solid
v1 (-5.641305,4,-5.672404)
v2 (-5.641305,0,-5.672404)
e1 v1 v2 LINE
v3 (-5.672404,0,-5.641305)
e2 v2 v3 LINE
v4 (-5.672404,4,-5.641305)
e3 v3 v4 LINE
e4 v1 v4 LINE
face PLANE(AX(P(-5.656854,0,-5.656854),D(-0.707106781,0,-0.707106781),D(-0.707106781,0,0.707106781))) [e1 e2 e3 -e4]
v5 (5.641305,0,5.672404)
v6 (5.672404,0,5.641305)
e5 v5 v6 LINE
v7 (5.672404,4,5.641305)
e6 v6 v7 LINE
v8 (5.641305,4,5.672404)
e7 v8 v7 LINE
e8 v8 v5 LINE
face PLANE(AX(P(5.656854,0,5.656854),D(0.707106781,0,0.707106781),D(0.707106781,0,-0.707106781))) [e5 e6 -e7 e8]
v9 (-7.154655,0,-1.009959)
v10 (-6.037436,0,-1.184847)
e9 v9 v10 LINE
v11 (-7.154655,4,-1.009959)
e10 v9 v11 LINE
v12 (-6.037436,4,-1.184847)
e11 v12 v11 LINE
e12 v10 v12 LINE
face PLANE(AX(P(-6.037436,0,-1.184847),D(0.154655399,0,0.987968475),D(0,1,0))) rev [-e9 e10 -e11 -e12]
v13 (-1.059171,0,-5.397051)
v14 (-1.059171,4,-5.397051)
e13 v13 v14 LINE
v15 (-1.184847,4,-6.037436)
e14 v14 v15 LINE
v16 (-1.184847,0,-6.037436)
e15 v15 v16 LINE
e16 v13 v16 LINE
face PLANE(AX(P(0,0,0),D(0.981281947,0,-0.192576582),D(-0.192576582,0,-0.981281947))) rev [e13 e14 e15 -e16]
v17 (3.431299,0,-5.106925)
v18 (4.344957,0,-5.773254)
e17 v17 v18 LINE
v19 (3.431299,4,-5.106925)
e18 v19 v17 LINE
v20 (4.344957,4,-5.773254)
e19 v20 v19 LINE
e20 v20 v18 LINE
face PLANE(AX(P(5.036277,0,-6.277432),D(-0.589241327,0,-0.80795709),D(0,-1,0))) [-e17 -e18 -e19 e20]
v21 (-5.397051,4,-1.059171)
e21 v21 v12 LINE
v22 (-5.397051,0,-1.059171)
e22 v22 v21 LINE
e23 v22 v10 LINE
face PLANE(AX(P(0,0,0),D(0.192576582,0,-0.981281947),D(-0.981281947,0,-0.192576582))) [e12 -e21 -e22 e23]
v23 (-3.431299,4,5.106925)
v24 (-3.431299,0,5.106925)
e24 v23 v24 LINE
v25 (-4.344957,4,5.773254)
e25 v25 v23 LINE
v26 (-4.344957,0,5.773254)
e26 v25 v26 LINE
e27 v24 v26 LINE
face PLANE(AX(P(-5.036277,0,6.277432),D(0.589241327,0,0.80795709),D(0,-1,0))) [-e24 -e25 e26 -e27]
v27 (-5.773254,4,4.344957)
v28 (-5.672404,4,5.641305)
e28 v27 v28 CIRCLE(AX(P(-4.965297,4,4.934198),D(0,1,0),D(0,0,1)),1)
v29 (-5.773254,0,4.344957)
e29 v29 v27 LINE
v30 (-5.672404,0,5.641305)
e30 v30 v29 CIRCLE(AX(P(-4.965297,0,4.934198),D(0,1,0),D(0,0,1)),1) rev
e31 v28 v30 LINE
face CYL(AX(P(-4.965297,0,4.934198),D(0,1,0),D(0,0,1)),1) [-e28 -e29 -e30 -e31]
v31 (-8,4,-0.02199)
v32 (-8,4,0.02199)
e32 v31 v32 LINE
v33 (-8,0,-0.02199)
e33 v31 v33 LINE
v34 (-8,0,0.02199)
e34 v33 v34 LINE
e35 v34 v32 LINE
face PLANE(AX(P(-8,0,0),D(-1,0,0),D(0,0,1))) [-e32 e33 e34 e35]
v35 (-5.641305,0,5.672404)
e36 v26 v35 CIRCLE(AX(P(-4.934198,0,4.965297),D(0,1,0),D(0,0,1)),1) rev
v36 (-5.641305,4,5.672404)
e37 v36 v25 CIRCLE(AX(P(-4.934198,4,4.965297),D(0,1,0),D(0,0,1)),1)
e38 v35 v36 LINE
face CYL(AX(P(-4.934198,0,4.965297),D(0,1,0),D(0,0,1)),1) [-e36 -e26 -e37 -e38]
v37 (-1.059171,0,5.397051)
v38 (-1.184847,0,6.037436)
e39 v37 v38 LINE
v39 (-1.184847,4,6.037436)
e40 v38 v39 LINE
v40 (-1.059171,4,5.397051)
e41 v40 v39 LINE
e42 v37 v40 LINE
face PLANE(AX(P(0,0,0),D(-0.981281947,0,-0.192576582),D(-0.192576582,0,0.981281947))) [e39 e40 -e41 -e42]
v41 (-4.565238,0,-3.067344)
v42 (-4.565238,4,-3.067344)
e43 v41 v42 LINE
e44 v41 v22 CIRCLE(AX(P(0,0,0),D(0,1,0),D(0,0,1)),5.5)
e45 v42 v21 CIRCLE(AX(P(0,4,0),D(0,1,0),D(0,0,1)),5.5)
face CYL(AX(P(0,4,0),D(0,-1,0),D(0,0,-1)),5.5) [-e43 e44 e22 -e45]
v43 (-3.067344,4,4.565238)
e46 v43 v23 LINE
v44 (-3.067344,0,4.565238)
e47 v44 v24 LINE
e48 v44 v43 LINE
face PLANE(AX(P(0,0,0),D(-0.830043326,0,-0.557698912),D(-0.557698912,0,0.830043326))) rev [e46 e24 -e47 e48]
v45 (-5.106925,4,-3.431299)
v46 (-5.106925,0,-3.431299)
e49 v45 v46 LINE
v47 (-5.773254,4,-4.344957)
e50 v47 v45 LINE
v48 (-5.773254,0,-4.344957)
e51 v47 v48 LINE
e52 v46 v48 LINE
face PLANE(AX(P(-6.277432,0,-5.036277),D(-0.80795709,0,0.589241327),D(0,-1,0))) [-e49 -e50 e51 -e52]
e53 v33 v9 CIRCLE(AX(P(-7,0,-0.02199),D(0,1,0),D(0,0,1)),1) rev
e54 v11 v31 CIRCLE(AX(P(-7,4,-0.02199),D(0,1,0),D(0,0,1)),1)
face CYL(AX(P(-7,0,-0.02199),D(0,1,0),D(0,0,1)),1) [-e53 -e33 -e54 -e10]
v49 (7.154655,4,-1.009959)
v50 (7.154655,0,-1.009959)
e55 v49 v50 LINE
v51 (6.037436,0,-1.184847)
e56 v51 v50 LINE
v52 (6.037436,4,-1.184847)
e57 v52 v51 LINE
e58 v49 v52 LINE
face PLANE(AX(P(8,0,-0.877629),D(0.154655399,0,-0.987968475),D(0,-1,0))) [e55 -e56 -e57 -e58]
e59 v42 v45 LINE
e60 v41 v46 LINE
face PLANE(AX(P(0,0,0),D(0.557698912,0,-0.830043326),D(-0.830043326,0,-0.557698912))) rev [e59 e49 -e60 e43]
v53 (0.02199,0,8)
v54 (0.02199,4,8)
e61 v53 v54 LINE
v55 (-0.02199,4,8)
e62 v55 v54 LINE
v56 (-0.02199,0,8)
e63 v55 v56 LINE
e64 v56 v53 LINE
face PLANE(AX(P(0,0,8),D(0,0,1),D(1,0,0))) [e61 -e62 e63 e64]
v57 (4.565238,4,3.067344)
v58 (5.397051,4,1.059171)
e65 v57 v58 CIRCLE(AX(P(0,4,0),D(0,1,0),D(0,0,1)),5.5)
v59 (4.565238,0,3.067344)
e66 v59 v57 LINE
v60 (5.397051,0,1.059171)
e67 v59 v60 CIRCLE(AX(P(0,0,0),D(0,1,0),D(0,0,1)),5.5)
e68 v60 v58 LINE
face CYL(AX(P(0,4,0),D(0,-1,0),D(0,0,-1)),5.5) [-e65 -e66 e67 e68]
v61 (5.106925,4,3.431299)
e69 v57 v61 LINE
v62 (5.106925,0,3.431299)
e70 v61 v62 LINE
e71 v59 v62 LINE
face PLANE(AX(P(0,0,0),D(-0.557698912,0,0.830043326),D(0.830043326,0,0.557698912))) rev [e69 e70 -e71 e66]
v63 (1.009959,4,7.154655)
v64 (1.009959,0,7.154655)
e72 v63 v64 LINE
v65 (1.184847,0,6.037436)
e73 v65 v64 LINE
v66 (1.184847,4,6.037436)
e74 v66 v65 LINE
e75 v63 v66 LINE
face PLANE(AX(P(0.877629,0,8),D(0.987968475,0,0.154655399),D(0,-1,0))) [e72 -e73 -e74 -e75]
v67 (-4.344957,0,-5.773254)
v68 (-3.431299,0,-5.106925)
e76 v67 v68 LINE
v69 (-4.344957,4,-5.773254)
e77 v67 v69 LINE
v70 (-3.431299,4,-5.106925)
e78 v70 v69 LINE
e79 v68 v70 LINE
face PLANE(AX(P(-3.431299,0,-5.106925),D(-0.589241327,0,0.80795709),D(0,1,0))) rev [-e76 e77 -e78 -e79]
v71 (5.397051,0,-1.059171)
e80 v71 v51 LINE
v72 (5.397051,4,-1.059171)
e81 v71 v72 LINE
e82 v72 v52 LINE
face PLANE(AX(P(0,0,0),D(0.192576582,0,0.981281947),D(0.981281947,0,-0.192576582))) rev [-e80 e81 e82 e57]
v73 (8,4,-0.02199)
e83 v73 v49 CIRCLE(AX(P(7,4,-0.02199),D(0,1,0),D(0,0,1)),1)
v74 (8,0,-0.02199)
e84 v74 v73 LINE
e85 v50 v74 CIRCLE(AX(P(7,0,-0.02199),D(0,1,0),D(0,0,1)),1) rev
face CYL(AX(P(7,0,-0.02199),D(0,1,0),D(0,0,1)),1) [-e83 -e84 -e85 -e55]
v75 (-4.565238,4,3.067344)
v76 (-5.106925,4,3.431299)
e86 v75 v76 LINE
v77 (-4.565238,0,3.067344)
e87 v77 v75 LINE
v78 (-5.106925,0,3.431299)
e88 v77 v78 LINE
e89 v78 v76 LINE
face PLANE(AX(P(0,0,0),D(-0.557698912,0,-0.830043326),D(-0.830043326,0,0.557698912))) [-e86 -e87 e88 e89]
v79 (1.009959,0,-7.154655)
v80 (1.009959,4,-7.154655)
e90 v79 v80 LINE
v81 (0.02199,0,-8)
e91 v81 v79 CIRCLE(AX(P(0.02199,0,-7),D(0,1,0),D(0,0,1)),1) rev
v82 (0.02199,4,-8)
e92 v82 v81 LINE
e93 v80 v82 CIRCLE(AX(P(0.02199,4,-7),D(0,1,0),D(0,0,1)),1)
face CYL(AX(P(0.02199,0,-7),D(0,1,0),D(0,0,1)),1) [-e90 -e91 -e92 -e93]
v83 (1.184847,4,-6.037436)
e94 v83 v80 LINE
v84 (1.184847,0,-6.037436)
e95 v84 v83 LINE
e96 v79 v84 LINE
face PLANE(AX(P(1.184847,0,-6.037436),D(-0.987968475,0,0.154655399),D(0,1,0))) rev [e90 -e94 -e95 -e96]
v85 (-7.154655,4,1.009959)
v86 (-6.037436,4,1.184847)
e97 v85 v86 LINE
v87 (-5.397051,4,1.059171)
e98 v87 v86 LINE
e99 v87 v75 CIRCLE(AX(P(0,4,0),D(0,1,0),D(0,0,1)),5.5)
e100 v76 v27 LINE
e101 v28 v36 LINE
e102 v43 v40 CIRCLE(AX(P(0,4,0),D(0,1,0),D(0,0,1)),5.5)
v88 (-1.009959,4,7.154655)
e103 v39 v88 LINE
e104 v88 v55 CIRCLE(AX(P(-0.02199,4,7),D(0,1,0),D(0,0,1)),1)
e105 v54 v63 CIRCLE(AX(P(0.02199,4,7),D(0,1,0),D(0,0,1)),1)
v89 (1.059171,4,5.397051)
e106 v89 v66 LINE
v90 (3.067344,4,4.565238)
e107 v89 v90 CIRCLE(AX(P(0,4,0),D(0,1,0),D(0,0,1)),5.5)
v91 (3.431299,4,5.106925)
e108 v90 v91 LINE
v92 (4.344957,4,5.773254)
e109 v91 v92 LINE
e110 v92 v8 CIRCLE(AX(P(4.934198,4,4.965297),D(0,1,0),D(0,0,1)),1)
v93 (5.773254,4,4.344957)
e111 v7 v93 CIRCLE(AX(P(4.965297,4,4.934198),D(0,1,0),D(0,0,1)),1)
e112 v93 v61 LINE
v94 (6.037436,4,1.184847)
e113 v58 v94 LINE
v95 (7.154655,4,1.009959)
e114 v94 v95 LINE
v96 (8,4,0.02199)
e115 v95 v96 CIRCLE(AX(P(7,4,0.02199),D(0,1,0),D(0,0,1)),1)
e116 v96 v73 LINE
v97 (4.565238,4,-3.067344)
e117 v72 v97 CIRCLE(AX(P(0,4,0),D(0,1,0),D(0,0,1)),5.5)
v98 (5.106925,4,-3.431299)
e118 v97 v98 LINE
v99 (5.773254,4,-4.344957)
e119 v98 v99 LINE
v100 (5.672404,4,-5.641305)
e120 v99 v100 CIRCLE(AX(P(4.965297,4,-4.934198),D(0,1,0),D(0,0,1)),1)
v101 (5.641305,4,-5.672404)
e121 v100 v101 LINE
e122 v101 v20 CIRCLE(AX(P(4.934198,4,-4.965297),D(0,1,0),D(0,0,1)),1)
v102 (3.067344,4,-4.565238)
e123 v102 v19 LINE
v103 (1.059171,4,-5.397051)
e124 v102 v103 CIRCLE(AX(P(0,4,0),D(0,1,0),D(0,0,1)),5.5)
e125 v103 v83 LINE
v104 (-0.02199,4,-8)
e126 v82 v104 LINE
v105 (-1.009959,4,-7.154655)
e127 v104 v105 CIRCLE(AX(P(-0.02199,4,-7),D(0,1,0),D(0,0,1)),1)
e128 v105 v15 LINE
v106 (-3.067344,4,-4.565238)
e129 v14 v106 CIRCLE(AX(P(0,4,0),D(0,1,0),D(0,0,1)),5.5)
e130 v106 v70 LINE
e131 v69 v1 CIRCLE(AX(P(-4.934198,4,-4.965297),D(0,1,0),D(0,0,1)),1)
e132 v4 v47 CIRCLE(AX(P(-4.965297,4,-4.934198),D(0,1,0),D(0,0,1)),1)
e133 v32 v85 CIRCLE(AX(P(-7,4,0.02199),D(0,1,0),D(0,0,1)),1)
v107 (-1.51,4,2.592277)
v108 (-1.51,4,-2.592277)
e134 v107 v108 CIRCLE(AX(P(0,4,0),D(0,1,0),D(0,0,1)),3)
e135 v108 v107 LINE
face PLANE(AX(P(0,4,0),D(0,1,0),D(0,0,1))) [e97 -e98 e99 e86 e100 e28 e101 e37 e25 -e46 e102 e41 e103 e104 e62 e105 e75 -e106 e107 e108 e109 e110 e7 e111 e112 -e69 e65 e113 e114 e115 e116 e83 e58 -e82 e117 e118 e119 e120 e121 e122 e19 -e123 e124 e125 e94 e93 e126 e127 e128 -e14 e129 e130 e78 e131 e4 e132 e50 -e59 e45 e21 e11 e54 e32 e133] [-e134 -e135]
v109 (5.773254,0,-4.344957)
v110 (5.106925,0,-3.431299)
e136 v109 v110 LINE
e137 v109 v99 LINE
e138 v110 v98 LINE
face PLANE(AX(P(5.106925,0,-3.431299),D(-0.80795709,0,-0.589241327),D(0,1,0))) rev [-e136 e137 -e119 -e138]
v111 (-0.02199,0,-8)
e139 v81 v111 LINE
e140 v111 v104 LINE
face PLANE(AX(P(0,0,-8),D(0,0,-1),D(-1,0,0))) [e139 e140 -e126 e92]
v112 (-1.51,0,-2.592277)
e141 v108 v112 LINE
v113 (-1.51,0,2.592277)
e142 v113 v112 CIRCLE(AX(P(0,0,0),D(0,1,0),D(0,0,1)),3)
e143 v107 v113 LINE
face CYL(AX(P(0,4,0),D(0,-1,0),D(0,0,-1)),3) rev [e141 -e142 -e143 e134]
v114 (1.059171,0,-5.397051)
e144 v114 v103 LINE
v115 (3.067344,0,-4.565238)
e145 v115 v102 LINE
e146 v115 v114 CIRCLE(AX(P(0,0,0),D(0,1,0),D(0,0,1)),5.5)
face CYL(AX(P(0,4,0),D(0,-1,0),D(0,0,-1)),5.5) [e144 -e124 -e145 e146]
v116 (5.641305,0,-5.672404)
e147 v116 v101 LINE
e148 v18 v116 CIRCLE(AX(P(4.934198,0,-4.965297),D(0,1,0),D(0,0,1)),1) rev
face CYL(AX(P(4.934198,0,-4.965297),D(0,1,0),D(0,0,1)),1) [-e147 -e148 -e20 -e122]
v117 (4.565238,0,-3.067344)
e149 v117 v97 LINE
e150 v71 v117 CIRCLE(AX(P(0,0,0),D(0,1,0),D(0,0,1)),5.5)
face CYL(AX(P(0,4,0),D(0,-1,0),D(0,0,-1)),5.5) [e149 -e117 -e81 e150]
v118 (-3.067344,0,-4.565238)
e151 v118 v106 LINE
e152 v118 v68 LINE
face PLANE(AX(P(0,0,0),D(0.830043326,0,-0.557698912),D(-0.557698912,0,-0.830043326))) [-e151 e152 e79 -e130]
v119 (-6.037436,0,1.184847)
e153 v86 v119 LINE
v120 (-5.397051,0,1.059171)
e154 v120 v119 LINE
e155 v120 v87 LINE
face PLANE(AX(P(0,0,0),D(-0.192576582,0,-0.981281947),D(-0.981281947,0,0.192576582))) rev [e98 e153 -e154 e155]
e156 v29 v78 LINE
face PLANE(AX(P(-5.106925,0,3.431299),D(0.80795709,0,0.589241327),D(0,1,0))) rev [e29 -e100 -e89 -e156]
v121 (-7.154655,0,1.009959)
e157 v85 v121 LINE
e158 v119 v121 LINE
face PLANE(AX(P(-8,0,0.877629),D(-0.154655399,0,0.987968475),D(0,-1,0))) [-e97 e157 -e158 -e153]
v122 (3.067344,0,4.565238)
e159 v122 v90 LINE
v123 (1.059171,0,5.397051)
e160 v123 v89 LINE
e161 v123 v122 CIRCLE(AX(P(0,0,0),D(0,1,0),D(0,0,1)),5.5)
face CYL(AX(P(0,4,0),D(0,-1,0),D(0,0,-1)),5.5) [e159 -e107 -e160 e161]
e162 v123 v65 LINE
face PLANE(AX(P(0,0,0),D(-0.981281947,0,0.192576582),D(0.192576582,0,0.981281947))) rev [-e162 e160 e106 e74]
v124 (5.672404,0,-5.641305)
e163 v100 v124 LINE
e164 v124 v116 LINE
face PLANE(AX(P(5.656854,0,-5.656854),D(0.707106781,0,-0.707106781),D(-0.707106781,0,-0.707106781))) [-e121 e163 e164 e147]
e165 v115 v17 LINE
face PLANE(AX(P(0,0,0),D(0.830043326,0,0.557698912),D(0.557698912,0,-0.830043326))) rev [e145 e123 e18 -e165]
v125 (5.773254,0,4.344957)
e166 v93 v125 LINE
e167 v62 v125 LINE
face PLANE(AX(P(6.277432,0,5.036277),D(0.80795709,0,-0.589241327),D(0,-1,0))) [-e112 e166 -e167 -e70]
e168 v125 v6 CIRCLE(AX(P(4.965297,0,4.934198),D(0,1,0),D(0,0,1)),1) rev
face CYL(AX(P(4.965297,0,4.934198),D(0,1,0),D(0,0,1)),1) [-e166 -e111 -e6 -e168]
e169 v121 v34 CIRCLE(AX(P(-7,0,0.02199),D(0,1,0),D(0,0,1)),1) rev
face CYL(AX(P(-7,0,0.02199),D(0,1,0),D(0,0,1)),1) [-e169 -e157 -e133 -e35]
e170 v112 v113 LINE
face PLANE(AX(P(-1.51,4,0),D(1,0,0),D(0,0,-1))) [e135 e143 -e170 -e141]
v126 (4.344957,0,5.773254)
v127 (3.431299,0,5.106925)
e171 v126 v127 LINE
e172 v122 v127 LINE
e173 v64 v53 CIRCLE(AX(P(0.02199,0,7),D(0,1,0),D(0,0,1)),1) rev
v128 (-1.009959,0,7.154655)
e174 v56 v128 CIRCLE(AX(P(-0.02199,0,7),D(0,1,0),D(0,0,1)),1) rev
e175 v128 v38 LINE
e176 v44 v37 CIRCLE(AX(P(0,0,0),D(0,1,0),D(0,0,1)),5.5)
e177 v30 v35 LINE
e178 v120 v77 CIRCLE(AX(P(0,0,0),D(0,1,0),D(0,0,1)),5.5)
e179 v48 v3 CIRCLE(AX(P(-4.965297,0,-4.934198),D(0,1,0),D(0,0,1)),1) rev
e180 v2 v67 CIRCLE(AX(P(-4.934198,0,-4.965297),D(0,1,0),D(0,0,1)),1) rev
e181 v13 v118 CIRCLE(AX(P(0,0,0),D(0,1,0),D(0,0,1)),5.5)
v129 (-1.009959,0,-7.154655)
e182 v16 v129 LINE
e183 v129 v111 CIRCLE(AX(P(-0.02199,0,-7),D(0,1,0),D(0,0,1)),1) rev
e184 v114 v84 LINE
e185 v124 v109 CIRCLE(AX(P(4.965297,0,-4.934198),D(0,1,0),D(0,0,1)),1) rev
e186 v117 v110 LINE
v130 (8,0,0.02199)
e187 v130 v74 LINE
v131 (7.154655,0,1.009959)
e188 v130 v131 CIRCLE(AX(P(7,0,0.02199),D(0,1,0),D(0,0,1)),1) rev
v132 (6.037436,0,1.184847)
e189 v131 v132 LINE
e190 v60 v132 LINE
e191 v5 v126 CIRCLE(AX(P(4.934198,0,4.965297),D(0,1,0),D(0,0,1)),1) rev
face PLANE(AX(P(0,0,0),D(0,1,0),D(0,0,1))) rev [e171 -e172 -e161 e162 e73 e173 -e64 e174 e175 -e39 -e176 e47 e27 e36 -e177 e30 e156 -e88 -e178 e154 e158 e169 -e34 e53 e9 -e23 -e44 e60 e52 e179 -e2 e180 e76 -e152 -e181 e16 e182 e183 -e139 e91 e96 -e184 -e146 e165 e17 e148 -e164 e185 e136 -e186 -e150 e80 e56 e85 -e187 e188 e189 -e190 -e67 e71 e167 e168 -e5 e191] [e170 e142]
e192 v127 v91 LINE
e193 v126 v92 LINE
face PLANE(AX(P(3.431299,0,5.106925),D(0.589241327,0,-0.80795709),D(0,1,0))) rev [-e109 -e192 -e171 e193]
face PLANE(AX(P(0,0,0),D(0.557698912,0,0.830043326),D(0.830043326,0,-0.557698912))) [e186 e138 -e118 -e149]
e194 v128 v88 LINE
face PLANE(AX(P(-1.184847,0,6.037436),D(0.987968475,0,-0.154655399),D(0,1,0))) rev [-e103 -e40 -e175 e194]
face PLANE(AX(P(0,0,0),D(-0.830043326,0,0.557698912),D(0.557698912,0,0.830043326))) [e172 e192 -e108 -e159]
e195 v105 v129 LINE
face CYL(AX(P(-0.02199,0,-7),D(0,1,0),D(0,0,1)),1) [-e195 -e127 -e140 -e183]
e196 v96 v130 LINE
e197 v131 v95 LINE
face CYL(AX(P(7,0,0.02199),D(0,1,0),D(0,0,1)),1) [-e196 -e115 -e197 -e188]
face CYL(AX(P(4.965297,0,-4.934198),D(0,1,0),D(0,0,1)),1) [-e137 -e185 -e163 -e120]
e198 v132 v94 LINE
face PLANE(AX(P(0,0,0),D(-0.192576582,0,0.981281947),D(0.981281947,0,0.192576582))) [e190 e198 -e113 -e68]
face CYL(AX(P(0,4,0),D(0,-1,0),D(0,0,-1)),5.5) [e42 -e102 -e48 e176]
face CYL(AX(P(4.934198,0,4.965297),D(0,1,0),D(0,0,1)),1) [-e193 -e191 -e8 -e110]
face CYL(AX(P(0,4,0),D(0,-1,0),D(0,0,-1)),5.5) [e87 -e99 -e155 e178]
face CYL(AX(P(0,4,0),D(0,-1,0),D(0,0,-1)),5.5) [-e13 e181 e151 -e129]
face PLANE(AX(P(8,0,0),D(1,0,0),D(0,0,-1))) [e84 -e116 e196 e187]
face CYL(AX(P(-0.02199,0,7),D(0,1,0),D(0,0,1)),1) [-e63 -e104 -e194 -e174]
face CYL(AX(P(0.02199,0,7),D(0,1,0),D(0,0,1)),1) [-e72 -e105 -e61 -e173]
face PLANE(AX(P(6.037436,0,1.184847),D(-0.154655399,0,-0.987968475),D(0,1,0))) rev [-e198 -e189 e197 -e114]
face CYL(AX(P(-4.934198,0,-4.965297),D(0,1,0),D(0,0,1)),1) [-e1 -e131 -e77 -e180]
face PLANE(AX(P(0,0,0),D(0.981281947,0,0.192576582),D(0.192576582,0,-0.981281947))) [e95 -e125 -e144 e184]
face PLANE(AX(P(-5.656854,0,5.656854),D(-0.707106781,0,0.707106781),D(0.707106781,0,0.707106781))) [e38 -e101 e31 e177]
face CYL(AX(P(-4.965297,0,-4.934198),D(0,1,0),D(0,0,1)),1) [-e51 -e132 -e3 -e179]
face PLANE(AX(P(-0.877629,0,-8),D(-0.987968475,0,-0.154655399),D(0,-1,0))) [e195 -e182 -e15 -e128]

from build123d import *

# Parameters (mm, degrees)
SKETCH1_R           = 5.5
BOSS_EXTRUDE1_DEPTH = 4
BOSS_EXTRUDE4_DEPTH = 4
CHAMFER5_SIZE       = 2
CHAMFER5_SIZE2      = 0.69237056
CHAMFER6_SIZE       = 2
CHAMFER6_SIZE2      = 0.69237056
FILLET1_R           = 1
CIRPATTERN2_DEPTH   = 4


# Read off the part's stored shape, not the designer's step: CirPattern2
with BuildPart() as part:
    # Sketch1 → Boss-Extrude1 (new body)
    with BuildSketch(Plane(origin=(0, 0, 0), x_dir=(1, 0, 0), z_dir=(0, 1, 0))):
        with Locations(Location((0, 0, 0), (0, 0, 270))):
            Circle(SKETCH1_R)
        with BuildLine():
            Line((-1.51, -2.592276991), (-1.51, 2.592276991))
            ThreePointArc((-1.51, 2.592276991), (3, 0), (-1.51, -2.592276991))
        make_face(mode=Mode.SUBTRACT)
    extrude(amount=BOSS_EXTRUDE1_DEPTH)

    # Sketch2 → Boss-Extrude4 (add)
    with BuildSketch(Plane(origin=(0, 4, 0), x_dir=(1, 0, 0), z_dir=(0, 1, 0))):
        with BuildLine():
            Line((-4.906409736, 0.962882911), (-8, 1.57))
            Line((-8, 1.57), (-8, -1.57))
            Line((-8, -1.57), (-4.906409736, -0.962882911))
            ThreePointArc((-4.906409736, -0.962882911), (-5, 0), (-4.906409736, 0.962882911))
        make_face()
    extrude(amount=-BOSS_EXTRUDE4_DEPTH)

    # Chamfer5
    chamfer5_edges = [part.edges().sort_by_distance(p)[0] for p in [
        (-8, 2, -1.57),
    ]]
    chamfer5_side = [part.faces().sort_by_distance(p)[0] for p in [
        (-6.698525355, 2, -1.314585601),
    ]]
    chamfer(chamfer5_edges, length=CHAMFER5_SIZE, length2=CHAMFER5_SIZE2, reference=chamfer5_side[0])

    # Chamfer6
    chamfer6_edges = [part.edges().sort_by_distance(p)[0] for p in [
        (-8, 2, 1.57),
    ]]
    chamfer6_side = [part.faces().sort_by_distance(p)[0] for p in [
        (-6.698525355, 2, 1.314585601),
    ]]
    chamfer(chamfer6_edges, length=CHAMFER6_SIZE, length2=CHAMFER6_SIZE2, reference=chamfer6_side[0])

    # Fillet1
    fillet1_edges = [part.edges().sort_by_distance(p)[0] for p in [
        (-8, 2, -0.87762944),
        (-8, 2, 0.87762944),
    ]]
    fillet(fillet1_edges, radius=FILLET1_R)

    # CirPattern2 outline → CirPattern2 (add)
    with BuildSketch(Plane(origin=(0, 0, 0), x_dir=(1, 0, 0), z_dir=(0, 1, 0))):
        with BuildLine():
            ThreePointArc((-3.067344016, -4.565238295), (-3.889087297, -3.889087297), (-4.565238295, -3.067344016))
            Line((-4.565238295, -3.067344016), (-5.106925243, -3.431298779))
            Line((-5.106925243, -3.431298779), (-5.773253973, -4.344956726))
            ThreePointArc((-5.773253973, -4.344956726), (-5.962284465, -5.0117594), (-5.672403665, -5.641304834))
            Line((-5.672403665, -5.641304834), (-5.641304834, -5.672403665))
            ThreePointArc((-5.641304834, -5.672403665), (-5.0117594, -5.962284465), (-4.344956726, -5.773253973))
            Line((-4.344956726, -5.773253973), (-3.431298779, -5.106925243))
            Line((-3.431298779, -5.106925243), (-3.067344016, -4.565238295))
        make_face()
        with BuildLine():
            ThreePointArc((-4.565238295, 3.067344016), (-3.889087297, 3.889087297), (-3.067344016, 4.565238295))
            Line((-3.067344016, 4.565238295), (-3.431298779, 5.106925243))
            Line((-3.431298779, 5.106925243), (-4.344956726, 5.773253973))
            ThreePointArc((-4.344956726, 5.773253973), (-5.0117594, 5.962284465), (-5.641304834, 5.672403665))
            Line((-5.641304834, 5.672403665), (-5.672403665, 5.641304834))
            ThreePointArc((-5.672403665, 5.641304834), (-5.962284465, 5.0117594), (-5.773253973, 4.344956726))
            Line((-5.773253973, 4.344956726), (-5.106925243, 3.431298779))
            Line((-5.106925243, 3.431298779), (-4.565238295, 3.067344016))
        make_face()
        with BuildLine():
            ThreePointArc((-1.059171202, 5.39705071), (0, 5.5), (1.059171202, 5.39705071))
            Line((1.059171202, 5.39705071), (1.184846836, 6.037436105))
            Line((1.184846836, 6.037436105), (1.009958669, 7.154655399))
            ThreePointArc((1.009958669, 7.154655399), (0.672122719, 7.759820834), (0.021990194, 8))
            Line((0.021990194, 8), (-0.021990194, 8))
            ThreePointArc((-0.021990194, 8), (-0.672122719, 7.759820834), (-1.009958669, 7.154655399))
            Line((-1.009958669, 7.154655399), (-1.184846836, 6.037436105))
            Line((-1.184846836, 6.037436105), (-1.059171202, 5.39705071))
        make_face()
        with BuildLine():
            ThreePointArc((3.067344016, 4.565238295), (3.889087297, 3.889087297), (4.565238295, 3.067344016))
            Line((4.565238295, 3.067344016), (5.106925243, 3.431298779))
            Line((5.106925243, 3.431298779), (5.773253973, 4.344956726))
            ThreePointArc((5.773253973, 4.344956726), (5.962284465, 5.0117594), (5.672403665, 5.641304834))
            Line((5.672403665, 5.641304834), (5.641304834, 5.672403665))
            ThreePointArc((5.641304834, 5.672403665), (5.0117594, 5.962284465), (4.344956726, 5.773253973))
            Line((4.344956726, 5.773253973), (3.431298779, 5.106925243))
            Line((3.431298779, 5.106925243), (3.067344016, 4.565238295))
        make_face()
        with BuildLine():
            ThreePointArc((5.39705071, 1.059171202), (5.5, 0), (5.39705071, -1.059171202))
            Line((5.39705071, -1.059171202), (6.037436105, -1.184846836))
            Line((6.037436105, -1.184846836), (7.154655399, -1.009958669))
            ThreePointArc((7.154655399, -1.009958669), (7.759820834, -0.672122719), (8, -0.021990194))
            Line((8, -0.021990194), (8, 0.021990194))
            ThreePointArc((8, 0.021990194), (7.759820834, 0.672122719), (7.154655399, 1.009958669))
            Line((7.154655399, 1.009958669), (6.037436105, 1.184846836))
            Line((6.037436105, 1.184846836), (5.39705071, 1.059171202))
        make_face()
        with BuildLine():
            ThreePointArc((4.565238295, -3.067344016), (3.889087297, -3.889087297), (3.067344016, -4.565238295))
            Line((3.067344016, -4.565238295), (3.431298779, -5.106925243))
            Line((3.431298779, -5.106925243), (4.344956726, -5.773253973))
            ThreePointArc((4.344956726, -5.773253973), (5.0117594, -5.962284465), (5.641304834, -5.672403665))
            Line((5.641304834, -5.672403665), (5.672403665, -5.641304834))
            ThreePointArc((5.672403665, -5.641304834), (5.962284465, -5.0117594), (5.773253973, -4.344956726))
            Line((5.773253973, -4.344956726), (5.106925243, -3.431298779))
            Line((5.106925243, -3.431298779), (4.565238295, -3.067344016))
        make_face()
        with BuildLine():
            ThreePointArc((1.059171202, -5.39705071), (0, -5.5), (-1.059171202, -5.39705071))
            Line((-1.059171202, -5.39705071), (-1.184846836, -6.037436105))
            Line((-1.184846836, -6.037436105), (-1.009958669, -7.154655399))
            ThreePointArc((-1.009958669, -7.154655399), (-0.672122719, -7.759820834), (-0.021990194, -8))
            Line((-0.021990194, -8), (0.021990194, -8))
            ThreePointArc((0.021990194, -8), (0.672122719, -7.759820834), (1.009958669, -7.154655399))
            Line((1.009958669, -7.154655399), (1.184846836, -6.037436105))
            Line((1.184846836, -6.037436105), (1.059171202, -5.39705071))
        make_face()
    extrude(amount=CIRPATTERN2_DEPTH)


solid = part.part
